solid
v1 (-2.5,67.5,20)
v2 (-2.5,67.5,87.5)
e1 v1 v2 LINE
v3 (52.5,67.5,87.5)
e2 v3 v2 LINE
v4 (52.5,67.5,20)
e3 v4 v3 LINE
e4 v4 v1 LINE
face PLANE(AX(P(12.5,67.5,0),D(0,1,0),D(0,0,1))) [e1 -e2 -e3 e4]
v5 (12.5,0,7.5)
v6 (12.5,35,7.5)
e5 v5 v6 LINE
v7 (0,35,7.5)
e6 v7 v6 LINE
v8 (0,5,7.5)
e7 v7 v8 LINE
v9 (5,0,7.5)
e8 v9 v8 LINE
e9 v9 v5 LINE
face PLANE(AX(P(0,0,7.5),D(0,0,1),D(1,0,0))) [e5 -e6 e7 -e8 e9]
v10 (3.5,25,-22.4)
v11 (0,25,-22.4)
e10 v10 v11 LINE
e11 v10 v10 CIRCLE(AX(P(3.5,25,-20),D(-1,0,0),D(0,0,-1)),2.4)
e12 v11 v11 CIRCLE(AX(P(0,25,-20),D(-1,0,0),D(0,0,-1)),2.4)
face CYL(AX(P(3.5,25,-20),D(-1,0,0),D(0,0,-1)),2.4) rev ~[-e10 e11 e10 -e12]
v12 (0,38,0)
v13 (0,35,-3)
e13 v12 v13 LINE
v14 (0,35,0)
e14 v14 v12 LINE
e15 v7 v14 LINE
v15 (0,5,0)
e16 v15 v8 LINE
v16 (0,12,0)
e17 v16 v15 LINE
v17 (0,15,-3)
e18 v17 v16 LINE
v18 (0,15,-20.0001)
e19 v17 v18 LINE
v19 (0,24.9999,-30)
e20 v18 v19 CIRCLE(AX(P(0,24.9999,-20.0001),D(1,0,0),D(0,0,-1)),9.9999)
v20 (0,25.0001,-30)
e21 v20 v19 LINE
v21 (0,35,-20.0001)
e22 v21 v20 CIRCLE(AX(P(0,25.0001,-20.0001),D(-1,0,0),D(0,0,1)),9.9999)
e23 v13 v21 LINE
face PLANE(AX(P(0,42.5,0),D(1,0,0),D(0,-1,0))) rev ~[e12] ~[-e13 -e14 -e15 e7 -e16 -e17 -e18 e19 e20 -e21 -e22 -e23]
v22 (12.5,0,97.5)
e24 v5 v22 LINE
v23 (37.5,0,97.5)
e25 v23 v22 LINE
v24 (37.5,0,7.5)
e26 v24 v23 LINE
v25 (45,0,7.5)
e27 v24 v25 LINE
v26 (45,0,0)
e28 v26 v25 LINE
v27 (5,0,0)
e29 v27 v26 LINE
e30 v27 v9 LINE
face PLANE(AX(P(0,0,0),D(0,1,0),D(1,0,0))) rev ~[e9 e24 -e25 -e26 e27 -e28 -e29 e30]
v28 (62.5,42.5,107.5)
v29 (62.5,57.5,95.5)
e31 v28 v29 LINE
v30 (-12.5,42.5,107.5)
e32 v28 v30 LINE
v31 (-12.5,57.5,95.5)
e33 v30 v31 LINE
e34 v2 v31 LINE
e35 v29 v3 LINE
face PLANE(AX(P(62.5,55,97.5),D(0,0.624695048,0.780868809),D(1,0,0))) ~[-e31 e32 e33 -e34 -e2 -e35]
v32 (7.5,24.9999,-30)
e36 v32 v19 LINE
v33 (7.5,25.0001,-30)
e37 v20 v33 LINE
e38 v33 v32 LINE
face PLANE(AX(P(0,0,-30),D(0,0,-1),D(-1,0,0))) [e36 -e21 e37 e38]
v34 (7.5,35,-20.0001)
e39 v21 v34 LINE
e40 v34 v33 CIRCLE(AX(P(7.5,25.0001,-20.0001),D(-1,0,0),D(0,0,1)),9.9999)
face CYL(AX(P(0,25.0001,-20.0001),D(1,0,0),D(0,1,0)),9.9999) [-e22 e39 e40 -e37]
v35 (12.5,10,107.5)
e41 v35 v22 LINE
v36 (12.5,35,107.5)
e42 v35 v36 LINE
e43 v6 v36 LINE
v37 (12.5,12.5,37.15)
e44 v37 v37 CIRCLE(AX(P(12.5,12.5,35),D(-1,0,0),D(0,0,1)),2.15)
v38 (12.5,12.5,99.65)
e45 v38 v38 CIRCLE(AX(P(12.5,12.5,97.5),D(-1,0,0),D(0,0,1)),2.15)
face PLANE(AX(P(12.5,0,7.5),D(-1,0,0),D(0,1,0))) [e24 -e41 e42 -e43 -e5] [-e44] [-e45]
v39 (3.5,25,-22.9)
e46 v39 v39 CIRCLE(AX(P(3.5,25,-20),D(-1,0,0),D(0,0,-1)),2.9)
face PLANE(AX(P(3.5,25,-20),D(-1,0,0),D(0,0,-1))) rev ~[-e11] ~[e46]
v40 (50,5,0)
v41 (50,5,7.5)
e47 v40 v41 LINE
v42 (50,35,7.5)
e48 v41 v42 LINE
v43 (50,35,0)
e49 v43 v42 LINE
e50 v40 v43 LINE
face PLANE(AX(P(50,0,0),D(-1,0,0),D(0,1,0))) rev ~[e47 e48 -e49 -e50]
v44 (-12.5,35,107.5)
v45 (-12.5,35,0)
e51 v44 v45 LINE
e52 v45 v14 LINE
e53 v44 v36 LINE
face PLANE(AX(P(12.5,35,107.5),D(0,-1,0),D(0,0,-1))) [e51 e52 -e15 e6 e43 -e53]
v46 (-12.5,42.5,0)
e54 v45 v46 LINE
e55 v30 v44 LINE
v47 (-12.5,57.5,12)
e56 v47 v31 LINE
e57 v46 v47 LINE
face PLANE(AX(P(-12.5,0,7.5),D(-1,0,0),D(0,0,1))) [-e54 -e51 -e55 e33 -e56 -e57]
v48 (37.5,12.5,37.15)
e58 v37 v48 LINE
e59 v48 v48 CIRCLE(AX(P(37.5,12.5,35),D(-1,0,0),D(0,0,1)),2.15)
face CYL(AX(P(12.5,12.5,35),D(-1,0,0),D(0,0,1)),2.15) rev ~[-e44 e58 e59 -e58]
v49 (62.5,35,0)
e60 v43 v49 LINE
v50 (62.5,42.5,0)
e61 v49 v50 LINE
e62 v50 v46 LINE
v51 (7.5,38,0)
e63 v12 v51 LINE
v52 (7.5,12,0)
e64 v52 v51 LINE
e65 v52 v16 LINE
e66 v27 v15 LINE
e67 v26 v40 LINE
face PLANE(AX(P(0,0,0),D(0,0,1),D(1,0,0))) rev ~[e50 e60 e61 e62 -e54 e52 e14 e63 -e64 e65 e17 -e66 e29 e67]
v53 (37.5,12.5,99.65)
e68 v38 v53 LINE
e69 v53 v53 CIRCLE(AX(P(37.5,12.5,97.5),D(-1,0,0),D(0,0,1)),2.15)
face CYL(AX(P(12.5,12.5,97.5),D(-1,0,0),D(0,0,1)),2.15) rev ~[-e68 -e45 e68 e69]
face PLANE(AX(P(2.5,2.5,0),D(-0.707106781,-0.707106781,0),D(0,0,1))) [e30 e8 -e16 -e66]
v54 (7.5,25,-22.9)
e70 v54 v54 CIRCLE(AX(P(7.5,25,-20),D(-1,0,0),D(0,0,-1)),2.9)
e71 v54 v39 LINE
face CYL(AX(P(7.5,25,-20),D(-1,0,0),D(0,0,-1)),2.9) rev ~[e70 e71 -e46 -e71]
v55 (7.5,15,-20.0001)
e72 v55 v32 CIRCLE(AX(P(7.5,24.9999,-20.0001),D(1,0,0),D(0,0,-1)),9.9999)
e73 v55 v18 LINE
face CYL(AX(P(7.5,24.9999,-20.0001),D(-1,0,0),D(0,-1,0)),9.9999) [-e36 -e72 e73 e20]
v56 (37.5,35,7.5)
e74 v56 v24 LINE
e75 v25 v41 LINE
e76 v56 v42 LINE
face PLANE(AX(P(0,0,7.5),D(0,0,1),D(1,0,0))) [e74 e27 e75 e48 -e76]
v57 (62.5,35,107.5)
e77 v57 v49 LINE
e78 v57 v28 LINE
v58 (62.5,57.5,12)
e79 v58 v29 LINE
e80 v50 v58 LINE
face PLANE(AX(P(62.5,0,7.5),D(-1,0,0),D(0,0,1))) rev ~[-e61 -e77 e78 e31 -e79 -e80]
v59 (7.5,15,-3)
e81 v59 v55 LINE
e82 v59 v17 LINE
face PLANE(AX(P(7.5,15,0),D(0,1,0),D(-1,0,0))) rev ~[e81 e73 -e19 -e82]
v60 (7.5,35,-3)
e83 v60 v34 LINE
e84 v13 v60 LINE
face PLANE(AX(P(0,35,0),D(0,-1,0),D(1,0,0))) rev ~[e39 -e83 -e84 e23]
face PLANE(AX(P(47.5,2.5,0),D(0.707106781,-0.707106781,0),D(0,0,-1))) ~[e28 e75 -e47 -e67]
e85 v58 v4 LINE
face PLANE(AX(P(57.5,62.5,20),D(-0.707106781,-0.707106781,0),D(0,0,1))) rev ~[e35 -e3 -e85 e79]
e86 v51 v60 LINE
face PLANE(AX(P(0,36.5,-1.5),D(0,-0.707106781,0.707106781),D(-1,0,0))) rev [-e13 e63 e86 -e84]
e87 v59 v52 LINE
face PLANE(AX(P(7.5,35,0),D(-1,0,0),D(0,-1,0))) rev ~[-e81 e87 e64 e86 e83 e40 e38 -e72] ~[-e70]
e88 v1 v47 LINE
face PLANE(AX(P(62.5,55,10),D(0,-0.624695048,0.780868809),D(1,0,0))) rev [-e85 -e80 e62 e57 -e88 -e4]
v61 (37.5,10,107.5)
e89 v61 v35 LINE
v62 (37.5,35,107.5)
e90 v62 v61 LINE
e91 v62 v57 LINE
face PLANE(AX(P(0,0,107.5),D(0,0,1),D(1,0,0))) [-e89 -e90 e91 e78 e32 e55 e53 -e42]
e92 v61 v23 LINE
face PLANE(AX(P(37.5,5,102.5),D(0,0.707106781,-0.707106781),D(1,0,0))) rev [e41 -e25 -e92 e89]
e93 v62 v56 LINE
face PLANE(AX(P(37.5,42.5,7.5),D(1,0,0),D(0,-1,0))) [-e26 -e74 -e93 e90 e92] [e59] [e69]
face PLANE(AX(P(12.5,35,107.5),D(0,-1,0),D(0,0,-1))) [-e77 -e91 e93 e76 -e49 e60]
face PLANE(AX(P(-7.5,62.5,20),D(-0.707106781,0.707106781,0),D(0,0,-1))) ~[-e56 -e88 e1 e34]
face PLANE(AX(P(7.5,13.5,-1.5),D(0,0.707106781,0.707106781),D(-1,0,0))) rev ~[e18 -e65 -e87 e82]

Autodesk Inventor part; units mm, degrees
ref_plane "YZ Plane" through (0, 0, 0) normal (1, 0, 0) x (0, 1, 0)
ref_plane "XZ Plane" through (0, 0, 0) normal (0, 1, 0) x (-1, 0, 0)
ref_plane "XY Plane" through (0, 0, 0) normal (0, 0, 1) x (1, 0, 0)
sketch "Sketch1" plane through (0, 0, 0) normal (0, 0, 1) x (1, 0, 0)
  line L0 (0, 0) -> (50, 0)
  line L1 (50, 0) -> (50, 42.5)
  line L2 (50, 42.5) -> (0, 42.5)
  line L3 (0, 42.5) -> (0, 0)
  dimension "d0" = 50
  dimension "d1" = 42.5
extrude "Extrusion1" add sketch "Sketch1" along normal blind 7.5
sketch "Sketch2" plane through (0, 0, 0) normal (0, 0, -1) x (-1, 0, 0)
  line L0 (0, 42.5) -> (0, 0) projected
  line L1 (0, 35) -> (-7.5, 35)
  line L2 (-7.5, 35) -> (-7.5, 15)
  line L3 (-7.5, 15) -> (0, 15)
  line L4 (0, 15) -> (0, 35)
  line L5 (-50, 42.5) -> (0, 42.5) projected
  line L6 (0, 0) -> (-50, 0) projected
  point P0 (0, 15)
  dimension "d4" = 7.5
  dimension "d5" = 20
  dimension "d55" = 15
extrude "Extrusion2" add sketch "Sketch2" along normal blind 30
fillet "Fillet1" radius 10 2 edges at (3.75, 35, -30) (3.75, 15, -30)
sketch "Sketch3" plane through (7.5, 15, 0) normal (1, 0, 0) x (0, 0, -1)
  arc A0 (20, 0) -> (20, 20) centre (20, 10) ccw projected
  line L0 (30, 10) -> (20, 10) construction
  point P0 (0, -15)
hole "Hole1" at (7.5, 25, -20) direction (-1, 0, 0) diameter 4.8 end through all counterbore diameter 5.8 counterbore depth 4
chamfer "Chamfer1" distance 3 angle 45 2 edges at (3.75, 35, 0) (3.75, 15, 0)
sketch "Sketch6" plane through (0, 0, 7.5) normal (0, 0, 1) x (1, 0, 0)
  line L0 (50, 42.5) -> (0, 42.5) projected
  line L1 (25, 42.5) -> (25, -7.5) construction
  line L2 (12.5, 0) -> (12.5, 42.5)
  line L3 (12.5, 42.5) -> (37.5, 42.5)
  line L4 (37.5, 42.5) -> (37.5, 0)
  line L5 (37.5, 0) -> (12.5, 0)
  point P0 (0, 0)
  point P1 (45, 50)
  point P2 (5, 50)
  point P3 (0, 42.5)
  dimension "d43" = 50
  dimension "d44" = 42.5
  dimension "d45" = 25
  dimension "d46" = 42.5
  dimension "d47" = 12.5
extrude "Extrusion5" add sketch "Sketch6" along normal blind 100
sketch "Sketch10" plane through (12.5, 0, 7.5) normal (-1, 0, 0) x (0, 0, 1)
  line L0 (100, 42.5) -> (100, 0) projected
  line L1 (100, 35) -> (-7.5, 35)
  line L2 (-7.5, 35) -> (-7.5, 67.5)
  line L3 (-7.5, 67.5) -> (100, 67.5)
  line L4 (100, 67.5) -> (100, 35)
  line L5 (0, 42.5) -> (100, 42.5) projected
  point P0 (-7.5, 0)
  dimension "d66" = 107.5
  dimension "d67" = 32.5
  dimension "d68" = 7.5
extrude "Extrusion9" add sketch "Sketch10" along normal blind 25 and the other way blind 50
chamfer "Chamfer3" distance 25 distance2 20 1 edges at (25, 67.5, 0) measured on face at (19.1667, 57.6667, 0)
chamfer "Chamfer4" distance 25 distance2 20 1 edges at (25, 67.5, 107.5) measured on face at (20.8333, 56.6667, 107.5)
chamfer "Chamfer5" distance 10 angle 45 2 edges at (-12.5, 67.5, 53.75) (62.5, 67.5, 53.75)
chamfer "Chamfer6" distance 10 angle 45 1 edges at (25, 0, 107.5)
chamfer "Chamfer7" distance 5 angle 45 2 edges at (0, 0, 3.75) (50, 0, 3.75)
sketch "Sketch11" plane through (12.5, 0, 7.5) normal (-1, 0, 0) x (0, 0, 1)
  line L0 (0, 5) -> (0, 35) projected
  line L1 (0, 12.5) -> (100, 12.5) construction
  line L2 (0, 12.5) -> (100, 12.5) construction
  line L3 (0, 0) -> (90, 0) projected
  line L4 (100, 35) -> (0, 35) projected
  line L5 (27.5, 35) -> (27.5, 0) construction
  line L6 (90, 0) -> (90, 35) construction
  line L7 (100, 35) -> (100, 10) projected
  circle A0 centre (27.5, 12.5) radius 2.15
  circle A1 centre (90, 12.5) radius 2.15
  point P0 (-7.5, 0)
  dimension "d88" = 100
  dimension "d90" = 12.5
  dimension "d91" = 27.5
  dimension "d92" = 10
  dimension "d93" = 4.3
  dimension "d94" = 4.3
extrude "Extrusion10" cut sketch "Sketch11" against normal through all
properties part number "ES117_Head"
